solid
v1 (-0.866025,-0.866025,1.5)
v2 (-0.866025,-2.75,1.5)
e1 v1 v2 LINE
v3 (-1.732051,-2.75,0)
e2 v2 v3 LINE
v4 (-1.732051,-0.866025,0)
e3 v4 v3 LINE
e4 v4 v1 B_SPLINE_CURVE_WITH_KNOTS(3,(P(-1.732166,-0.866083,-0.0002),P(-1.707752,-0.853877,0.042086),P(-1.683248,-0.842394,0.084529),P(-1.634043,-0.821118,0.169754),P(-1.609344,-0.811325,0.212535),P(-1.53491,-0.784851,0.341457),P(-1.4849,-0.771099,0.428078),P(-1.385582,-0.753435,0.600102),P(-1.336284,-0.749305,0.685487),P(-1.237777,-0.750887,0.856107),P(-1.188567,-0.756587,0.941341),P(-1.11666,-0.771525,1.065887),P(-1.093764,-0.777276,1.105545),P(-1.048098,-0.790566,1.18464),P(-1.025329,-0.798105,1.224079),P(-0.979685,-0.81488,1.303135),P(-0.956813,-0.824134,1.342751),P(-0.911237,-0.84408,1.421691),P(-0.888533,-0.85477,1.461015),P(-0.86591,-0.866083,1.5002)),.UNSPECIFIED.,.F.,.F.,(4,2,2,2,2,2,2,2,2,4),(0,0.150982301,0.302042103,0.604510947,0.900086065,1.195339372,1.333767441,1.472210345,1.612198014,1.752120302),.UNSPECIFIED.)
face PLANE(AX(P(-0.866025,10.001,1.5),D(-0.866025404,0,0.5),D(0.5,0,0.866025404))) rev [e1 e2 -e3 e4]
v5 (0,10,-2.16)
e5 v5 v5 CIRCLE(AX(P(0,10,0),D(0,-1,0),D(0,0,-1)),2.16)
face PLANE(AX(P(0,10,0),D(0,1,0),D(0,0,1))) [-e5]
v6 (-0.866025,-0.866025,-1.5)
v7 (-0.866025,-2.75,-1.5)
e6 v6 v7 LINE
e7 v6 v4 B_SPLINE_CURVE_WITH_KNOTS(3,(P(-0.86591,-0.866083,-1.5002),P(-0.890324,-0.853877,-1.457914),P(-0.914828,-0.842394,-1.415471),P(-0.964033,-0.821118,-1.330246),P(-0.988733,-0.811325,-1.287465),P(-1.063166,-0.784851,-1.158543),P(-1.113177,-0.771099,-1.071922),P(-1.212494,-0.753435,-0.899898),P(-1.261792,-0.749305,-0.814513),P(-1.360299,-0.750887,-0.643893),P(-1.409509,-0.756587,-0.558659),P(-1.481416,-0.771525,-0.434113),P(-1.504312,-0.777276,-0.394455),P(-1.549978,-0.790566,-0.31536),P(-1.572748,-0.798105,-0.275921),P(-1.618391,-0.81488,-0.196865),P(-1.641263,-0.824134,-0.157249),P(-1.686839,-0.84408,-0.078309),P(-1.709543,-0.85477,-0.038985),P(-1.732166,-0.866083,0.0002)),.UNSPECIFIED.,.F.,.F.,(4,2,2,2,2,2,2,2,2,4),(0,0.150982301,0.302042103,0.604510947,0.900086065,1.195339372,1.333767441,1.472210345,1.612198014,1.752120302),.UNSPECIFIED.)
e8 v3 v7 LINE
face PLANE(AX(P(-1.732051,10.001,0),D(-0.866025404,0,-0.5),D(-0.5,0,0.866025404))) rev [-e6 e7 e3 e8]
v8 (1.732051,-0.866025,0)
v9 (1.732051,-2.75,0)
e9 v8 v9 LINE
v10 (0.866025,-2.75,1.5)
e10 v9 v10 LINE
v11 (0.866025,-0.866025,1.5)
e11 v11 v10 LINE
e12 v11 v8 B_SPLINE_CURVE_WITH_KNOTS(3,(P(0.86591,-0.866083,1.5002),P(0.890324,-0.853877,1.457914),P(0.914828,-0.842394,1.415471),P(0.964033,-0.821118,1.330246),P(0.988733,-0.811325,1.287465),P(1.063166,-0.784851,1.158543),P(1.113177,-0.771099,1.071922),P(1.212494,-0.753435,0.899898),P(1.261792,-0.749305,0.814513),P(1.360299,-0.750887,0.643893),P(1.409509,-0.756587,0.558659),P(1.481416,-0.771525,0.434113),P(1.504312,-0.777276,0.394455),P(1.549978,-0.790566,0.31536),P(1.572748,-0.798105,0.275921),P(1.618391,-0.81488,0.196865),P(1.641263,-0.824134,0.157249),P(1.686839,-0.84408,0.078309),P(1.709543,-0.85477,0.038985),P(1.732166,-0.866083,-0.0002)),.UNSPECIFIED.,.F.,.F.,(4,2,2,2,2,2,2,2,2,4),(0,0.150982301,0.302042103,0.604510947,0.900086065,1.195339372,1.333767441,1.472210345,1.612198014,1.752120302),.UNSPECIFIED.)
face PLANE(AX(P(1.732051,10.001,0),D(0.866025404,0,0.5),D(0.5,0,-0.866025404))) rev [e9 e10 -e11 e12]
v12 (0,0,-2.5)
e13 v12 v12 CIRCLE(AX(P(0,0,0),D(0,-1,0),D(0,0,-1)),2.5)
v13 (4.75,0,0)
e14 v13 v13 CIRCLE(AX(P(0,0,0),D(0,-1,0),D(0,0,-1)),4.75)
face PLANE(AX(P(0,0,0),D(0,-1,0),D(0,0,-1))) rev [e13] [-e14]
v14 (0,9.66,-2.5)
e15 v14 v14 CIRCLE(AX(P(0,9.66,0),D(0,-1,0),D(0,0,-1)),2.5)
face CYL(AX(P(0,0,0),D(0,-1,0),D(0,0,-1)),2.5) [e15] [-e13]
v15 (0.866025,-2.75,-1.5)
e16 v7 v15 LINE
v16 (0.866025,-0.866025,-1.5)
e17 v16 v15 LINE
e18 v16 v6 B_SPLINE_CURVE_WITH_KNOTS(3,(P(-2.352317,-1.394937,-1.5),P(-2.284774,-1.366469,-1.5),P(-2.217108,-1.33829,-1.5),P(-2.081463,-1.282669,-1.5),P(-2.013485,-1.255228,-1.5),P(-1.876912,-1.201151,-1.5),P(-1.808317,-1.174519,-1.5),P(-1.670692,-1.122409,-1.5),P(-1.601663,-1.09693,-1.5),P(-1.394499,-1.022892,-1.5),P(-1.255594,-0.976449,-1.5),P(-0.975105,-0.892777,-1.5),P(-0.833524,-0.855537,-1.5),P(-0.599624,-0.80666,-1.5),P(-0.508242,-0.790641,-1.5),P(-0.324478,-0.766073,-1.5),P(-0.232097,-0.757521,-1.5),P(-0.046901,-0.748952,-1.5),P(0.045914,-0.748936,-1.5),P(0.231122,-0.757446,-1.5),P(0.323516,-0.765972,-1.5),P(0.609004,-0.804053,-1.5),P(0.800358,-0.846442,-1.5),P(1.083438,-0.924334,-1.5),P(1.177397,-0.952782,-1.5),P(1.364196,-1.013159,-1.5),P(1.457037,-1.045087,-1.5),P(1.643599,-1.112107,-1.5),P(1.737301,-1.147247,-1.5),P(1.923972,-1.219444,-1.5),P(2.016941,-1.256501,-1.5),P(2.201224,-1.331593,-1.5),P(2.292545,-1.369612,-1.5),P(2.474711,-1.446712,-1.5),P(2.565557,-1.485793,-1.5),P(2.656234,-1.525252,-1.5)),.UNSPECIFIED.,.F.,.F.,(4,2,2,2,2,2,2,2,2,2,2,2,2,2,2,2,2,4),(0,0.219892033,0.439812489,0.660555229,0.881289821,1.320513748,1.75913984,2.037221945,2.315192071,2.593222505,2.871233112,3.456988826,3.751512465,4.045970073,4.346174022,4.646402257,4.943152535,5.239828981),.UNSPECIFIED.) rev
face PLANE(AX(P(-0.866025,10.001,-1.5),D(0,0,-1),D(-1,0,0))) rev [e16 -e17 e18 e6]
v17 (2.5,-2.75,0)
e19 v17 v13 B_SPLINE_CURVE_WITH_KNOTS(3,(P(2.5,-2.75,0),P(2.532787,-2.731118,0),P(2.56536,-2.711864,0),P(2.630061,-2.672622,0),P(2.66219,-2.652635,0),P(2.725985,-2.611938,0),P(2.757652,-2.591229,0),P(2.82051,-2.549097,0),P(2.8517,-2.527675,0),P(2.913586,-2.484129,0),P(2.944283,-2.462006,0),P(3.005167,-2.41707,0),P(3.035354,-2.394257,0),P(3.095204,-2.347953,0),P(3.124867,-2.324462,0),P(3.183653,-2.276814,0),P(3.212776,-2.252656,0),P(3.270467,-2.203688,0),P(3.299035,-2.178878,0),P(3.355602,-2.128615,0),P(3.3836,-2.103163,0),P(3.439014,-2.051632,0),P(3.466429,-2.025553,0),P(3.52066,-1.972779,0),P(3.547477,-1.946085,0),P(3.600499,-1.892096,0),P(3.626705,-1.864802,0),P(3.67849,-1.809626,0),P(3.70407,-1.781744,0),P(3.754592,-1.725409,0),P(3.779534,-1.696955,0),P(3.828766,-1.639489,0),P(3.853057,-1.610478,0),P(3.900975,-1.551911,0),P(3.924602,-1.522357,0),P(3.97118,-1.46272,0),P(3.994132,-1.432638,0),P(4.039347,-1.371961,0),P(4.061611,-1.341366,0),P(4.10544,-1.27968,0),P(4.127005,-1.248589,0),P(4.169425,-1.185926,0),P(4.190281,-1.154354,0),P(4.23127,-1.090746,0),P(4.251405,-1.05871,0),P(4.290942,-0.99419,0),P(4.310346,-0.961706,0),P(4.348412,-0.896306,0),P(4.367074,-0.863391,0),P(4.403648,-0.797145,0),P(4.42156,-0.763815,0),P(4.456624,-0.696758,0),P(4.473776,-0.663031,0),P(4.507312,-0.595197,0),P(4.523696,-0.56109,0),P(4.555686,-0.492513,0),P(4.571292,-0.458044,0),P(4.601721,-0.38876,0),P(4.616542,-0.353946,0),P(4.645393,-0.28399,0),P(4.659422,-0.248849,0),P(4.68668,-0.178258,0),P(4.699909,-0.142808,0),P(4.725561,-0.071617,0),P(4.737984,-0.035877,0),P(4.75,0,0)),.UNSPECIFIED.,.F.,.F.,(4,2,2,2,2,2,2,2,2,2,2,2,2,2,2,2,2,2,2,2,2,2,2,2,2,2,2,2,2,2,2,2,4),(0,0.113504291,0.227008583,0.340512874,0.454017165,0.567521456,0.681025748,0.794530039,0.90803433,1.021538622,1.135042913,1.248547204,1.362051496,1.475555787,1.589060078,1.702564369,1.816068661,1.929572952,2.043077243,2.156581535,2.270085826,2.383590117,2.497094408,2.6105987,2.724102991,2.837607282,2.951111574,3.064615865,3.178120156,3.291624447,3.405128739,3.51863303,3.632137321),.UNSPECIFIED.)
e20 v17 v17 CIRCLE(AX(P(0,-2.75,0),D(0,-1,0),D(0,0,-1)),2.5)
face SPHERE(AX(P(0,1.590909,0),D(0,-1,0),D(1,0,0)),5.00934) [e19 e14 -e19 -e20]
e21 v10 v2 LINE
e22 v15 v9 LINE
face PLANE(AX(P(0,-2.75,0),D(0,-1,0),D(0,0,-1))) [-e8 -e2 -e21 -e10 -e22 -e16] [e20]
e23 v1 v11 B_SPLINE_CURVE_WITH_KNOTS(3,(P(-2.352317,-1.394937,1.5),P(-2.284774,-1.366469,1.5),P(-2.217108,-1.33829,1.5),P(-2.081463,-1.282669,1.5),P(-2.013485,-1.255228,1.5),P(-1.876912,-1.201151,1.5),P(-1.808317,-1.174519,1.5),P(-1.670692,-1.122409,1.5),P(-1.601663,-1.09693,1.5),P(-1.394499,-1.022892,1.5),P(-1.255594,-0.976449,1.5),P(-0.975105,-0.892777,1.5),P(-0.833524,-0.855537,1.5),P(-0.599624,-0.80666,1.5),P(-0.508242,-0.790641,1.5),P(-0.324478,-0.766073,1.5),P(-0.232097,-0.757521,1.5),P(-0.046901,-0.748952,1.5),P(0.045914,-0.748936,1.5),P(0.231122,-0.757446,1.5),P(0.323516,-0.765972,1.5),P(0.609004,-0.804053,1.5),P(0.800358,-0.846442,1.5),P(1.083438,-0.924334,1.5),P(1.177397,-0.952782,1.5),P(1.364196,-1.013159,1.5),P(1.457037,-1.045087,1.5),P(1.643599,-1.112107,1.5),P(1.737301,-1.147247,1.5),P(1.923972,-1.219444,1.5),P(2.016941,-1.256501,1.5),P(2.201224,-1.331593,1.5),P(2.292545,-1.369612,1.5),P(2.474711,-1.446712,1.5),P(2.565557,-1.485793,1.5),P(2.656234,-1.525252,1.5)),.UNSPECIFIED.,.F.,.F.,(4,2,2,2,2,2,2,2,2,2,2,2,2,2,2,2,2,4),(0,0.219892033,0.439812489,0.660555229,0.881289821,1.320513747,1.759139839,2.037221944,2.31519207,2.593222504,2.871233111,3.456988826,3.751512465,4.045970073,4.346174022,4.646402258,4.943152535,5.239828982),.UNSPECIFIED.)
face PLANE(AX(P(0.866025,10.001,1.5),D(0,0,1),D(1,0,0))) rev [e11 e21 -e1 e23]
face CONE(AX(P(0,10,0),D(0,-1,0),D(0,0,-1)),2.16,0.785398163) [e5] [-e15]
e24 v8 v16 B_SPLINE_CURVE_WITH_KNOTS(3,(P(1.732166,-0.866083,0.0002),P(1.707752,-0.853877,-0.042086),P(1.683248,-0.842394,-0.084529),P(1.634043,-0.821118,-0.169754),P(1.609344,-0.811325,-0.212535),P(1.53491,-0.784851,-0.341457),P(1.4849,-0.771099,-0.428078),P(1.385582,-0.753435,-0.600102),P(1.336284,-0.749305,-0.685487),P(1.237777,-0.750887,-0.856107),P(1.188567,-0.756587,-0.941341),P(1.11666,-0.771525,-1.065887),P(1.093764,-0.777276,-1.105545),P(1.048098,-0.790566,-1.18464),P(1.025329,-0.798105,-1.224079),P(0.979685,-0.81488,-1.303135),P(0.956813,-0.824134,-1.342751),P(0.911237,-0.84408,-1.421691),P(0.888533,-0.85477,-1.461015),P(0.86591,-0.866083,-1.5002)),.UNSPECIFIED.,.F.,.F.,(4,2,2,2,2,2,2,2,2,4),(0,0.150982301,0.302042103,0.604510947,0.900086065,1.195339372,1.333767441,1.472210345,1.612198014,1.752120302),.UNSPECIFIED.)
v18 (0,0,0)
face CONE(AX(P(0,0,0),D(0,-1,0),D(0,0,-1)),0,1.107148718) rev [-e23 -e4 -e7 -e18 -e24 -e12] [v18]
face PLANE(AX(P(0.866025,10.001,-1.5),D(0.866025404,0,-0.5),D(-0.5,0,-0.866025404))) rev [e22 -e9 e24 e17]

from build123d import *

# Parameters (mm, degrees)
CUT_EXTRUDE_1_REACH = 16.411


with BuildPart() as part:
    # 草图1 → 旋转2 (revolve)
    with BuildSketch(Plane.XY):
        with BuildLine():
            Line((4.75, 0), (2.5, 0))
            Line((2.5, 0), (2.5, 9.66))
            Line((2.5, 9.66), (2.16, 10))
            Line((2.16, 10), (0, 10))
            Line((0, 10), (0, 0))
            Line((0, 0), (1.5, -0.75))
            Line((1.5, -0.75), (1.5, -2.75))
            Line((1.5, -2.75), (2.5, -2.75))
            ThreePointArc((2.5, -2.75), (3.877015605, -1.581194586), (4.75, 0))
        make_face()
    revolve(axis=Axis((0, 0, 0), (0, 1, 0)))

    # 切除-拉伸1: up to this cone (the profile starts inside it)
    cut_extrude_1_end = Plane(origin=(0, -2.75, 0), z_dir=(0, -1, 0)).offset(-2.749999) * Cone(2e-06, 50.322, 25.160999, align=(Align.CENTER, Align.CENTER, Align.MIN), mode=Mode.PRIVATE)
    # 草图2 → 切除-拉伸1 (cut, up to the surface)
    with BuildSketch(Plane.XZ.offset(2.75), mode=Mode.PRIVATE) as cut_extrude_1_sk1:
        Polygon((1.732050808, 0), (0.866025404, 1.5), (-0.866025404, 1.5), (-1.732050808, 0), (-0.866025404, -1.5), (0.866025404, -1.5), align=None)
    cut_extrude_1_tool1 = extrude(cut_extrude_1_sk1.sketch, amount=-CUT_EXTRUDE_1_REACH, mode=Mode.PRIVATE) & cut_extrude_1_end
    add(cut_extrude_1_tool1.solids().sort_by_distance((0, -2.75, 0))[0], mode=Mode.SUBTRACT)


solid = part.part
